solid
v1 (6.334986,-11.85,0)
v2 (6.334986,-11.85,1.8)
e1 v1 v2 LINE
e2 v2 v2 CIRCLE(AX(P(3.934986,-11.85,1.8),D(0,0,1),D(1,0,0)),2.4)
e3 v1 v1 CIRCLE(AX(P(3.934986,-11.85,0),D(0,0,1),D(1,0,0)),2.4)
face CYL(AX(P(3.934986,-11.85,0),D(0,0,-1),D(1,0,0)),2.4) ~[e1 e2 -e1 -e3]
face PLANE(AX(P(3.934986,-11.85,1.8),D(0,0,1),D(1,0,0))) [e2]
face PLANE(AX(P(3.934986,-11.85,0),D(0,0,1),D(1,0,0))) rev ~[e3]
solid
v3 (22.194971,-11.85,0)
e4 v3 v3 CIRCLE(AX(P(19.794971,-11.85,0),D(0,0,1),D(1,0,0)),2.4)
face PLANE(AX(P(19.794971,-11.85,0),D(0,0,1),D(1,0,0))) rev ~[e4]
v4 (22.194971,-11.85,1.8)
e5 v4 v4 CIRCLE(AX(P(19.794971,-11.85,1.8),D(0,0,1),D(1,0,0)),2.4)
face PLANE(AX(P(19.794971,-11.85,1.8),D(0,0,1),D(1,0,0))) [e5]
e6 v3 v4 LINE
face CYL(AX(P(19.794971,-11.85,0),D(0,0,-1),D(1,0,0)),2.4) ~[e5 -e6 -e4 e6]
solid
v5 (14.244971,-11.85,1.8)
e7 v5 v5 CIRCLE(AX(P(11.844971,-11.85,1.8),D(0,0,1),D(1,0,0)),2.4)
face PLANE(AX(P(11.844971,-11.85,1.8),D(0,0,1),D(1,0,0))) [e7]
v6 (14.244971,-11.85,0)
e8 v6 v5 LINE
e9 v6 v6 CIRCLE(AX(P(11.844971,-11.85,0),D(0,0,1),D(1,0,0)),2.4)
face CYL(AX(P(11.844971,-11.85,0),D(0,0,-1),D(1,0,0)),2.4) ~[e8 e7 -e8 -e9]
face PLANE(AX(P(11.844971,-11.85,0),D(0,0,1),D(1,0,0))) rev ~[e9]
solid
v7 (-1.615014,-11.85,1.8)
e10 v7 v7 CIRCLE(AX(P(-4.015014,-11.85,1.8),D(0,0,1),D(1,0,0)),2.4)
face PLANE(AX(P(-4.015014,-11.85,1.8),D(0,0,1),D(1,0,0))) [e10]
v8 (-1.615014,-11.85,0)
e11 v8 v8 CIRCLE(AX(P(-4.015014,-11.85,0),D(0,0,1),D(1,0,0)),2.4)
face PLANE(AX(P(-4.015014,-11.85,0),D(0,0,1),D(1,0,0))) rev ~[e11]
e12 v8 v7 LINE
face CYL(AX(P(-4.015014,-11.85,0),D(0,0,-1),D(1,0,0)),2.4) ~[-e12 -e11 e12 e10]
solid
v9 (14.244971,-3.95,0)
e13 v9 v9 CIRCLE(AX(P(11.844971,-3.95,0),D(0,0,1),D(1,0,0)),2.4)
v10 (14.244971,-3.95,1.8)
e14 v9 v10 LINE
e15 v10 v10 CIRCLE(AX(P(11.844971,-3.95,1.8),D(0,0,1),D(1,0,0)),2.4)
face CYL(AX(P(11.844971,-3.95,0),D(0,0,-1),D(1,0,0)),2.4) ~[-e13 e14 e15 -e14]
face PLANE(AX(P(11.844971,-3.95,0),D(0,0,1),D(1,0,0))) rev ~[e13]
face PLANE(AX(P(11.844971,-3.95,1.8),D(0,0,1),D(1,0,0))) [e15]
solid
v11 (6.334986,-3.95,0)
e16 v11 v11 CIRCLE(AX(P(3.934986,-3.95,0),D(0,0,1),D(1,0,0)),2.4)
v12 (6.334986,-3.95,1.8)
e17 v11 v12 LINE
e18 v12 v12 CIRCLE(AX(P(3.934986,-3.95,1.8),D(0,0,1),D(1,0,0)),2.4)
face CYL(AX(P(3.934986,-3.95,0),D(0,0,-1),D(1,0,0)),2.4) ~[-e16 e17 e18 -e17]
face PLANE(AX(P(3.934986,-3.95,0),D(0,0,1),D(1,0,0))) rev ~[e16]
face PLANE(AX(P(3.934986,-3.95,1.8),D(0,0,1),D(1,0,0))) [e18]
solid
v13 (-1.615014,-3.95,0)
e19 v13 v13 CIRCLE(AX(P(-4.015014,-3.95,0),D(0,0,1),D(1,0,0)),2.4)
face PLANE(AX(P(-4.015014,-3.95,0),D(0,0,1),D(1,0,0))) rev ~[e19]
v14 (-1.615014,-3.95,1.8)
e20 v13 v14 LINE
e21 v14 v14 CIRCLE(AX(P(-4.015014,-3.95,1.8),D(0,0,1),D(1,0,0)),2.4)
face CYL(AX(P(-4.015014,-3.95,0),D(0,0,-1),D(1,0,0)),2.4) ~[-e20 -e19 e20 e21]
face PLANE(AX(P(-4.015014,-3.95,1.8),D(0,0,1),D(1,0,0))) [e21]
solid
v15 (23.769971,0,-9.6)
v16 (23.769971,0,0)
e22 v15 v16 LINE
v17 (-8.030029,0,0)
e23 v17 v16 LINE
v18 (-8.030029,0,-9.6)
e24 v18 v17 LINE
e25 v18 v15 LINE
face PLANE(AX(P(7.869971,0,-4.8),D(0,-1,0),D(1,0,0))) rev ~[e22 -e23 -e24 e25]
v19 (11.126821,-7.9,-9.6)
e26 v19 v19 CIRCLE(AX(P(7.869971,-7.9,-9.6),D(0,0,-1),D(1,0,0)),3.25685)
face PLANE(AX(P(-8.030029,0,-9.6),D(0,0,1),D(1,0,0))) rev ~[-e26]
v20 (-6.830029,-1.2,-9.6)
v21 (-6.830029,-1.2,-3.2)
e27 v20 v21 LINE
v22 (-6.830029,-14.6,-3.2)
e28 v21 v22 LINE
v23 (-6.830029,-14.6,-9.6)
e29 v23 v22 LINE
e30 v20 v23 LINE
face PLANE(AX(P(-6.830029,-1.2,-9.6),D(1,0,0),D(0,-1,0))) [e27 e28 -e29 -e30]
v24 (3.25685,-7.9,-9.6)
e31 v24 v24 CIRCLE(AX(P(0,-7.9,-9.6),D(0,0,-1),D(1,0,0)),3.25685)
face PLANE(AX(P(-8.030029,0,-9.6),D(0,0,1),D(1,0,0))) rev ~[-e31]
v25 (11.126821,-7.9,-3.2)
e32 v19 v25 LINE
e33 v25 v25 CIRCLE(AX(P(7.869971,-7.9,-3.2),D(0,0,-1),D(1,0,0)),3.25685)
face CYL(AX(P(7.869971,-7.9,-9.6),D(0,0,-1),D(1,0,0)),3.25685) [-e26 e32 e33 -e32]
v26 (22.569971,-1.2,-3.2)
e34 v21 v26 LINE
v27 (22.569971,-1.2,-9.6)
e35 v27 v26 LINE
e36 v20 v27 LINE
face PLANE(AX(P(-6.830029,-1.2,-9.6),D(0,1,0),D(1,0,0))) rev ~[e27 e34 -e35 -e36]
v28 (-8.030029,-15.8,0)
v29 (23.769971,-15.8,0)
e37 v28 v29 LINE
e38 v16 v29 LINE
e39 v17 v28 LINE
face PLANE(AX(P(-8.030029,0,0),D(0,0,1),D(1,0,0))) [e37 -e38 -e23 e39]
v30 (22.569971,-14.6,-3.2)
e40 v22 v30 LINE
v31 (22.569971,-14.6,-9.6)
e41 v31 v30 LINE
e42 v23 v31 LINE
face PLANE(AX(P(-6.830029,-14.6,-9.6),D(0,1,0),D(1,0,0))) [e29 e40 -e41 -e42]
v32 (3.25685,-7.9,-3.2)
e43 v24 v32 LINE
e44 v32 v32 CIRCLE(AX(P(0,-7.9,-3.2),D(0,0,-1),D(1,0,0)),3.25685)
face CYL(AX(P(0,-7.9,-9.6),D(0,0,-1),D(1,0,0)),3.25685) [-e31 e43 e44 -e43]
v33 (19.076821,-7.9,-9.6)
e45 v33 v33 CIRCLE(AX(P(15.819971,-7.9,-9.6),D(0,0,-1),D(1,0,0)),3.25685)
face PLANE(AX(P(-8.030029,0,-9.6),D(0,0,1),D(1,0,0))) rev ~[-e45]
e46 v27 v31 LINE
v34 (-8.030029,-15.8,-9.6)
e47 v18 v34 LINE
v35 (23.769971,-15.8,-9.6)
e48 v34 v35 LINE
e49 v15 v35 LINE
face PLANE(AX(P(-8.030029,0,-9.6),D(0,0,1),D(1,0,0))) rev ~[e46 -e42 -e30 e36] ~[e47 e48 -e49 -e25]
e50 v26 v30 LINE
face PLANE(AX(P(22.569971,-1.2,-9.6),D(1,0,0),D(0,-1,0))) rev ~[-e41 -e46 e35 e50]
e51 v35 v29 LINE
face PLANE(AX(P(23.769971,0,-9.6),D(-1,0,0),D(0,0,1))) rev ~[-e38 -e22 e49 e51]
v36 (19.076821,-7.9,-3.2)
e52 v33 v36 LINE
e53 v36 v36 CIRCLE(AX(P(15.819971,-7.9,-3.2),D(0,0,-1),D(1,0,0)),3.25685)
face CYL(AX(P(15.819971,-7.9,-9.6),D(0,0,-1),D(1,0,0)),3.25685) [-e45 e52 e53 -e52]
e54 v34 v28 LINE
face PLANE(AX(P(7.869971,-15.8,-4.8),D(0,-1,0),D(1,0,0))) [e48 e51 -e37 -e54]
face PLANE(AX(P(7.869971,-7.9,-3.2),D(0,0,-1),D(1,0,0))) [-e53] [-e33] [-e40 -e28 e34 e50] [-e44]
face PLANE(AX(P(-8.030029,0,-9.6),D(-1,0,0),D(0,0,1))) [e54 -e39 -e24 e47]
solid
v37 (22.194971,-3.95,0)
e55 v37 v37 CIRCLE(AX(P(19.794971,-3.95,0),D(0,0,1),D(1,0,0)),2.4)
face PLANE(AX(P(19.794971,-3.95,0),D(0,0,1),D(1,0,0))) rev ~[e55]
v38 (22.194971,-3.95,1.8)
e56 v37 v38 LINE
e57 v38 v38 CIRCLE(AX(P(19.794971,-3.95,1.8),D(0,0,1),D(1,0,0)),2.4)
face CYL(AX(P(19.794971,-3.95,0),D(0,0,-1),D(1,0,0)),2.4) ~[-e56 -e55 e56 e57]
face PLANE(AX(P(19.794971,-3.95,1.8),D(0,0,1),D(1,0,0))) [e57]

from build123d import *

# Parameters (mm, degrees)
F0_W     = 31.8
F0_H     = 9.6
F1_DEPTH = 15.8
F2_R     = 2.4
F3_DEPTH = 1.8
F4_W     = 29.4
F4_H     = 13.4
F4_R     = 3.25685
F5_DEPTH = 6.4


# Not quite as in the source:
# - the program builds the solid bodies; features that only make, move or delete a surface that nothing else refers to are left out


with BuildPart() as f1:
    # F0 (on Front) → F1 (new body)
    with BuildSketch(Plane.XZ):
        with Locations((7.8699710073, -4.8)):
            Rectangle(F0_W, F0_H)
    extrude(amount=F1_DEPTH)

    # F4 (on face) → F5 (cut)
    with BuildSketch(Plane(origin=(0, 0, -9.6), x_dir=(1, 0, 0), z_dir=(0, 0, -1))):
        with Locations((7.8699710073, 7.9)):
            Rectangle(F4_W, F4_H)
        with Locations((0, 7.9)):
            Circle(F4_R, mode=Mode.SUBTRACT)
        with Locations((7.8699710073, 7.9)):
            Circle(F4_R, mode=Mode.SUBTRACT)
        with Locations((15.8199710073, 7.9)):
            Circle(F4_R, mode=Mode.SUBTRACT)
    extrude(amount=-F5_DEPTH, mode=Mode.SUBTRACT)


with BuildPart() as f3:
    # F2 (on face) → F3 (new body)
    with BuildSketch(Plane.XY):
        with Locations((19.7949710073, -3.95)):
            Circle(F2_R)
    extrude(amount=F3_DEPTH)


with BuildPart() as f3b:
    # F2 (on face) → F3, piece 2 (new body)
    with BuildSketch(Plane.XY):
        with Locations((19.7949710073, -11.85)):
            Circle(F2_R)
    extrude(amount=F3_DEPTH)


with BuildPart() as f3c:
    # F2 (on face) → F3, piece 3 (new body)
    with BuildSketch(Plane.XY):
        with Locations((11.8449710073, -11.85)):
            Circle(F2_R)
    extrude(amount=F3_DEPTH)


with BuildPart() as f3d:
    # F2 (on face) → F3, piece 4 (new body)
    with BuildSketch(Plane.XY):
        with Locations((3.9349855036, -3.95)):
            Circle(F2_R)
    extrude(amount=F3_DEPTH)


with BuildPart() as f3e:
    # F2 (on face) → F3, piece 5 (new body)
    with BuildSketch(Plane.XY):
        with Locations((11.8449710073, -3.95)):
            Circle(F2_R)
    extrude(amount=F3_DEPTH)


with BuildPart() as f3f:
    # F2 (on face) → F3, piece 6 (new body)
    with BuildSketch(Plane.XY):
        with Locations((3.9349855036, -11.85)):
            Circle(F2_R)
    extrude(amount=F3_DEPTH)


with BuildPart() as f3g:
    # F2 (on face) → F3, piece 7 (new body)
    with BuildSketch(Plane.XY):
        with Locations((-4.0150144964, -11.85)):
            Circle(F2_R)
    extrude(amount=F3_DEPTH)


with BuildPart() as f3h:
    # F2 (on face) → F3, piece 8 (new body)
    with BuildSketch(Plane.XY):
        with Locations((-4.0150144964, -3.95)):
            Circle(F2_R)
    extrude(amount=F3_DEPTH)


solid = Compound([f1.part, f3.part, f3b.part, f3c.part, f3d.part, f3e.part, f3f.part, f3g.part, f3h.part])
